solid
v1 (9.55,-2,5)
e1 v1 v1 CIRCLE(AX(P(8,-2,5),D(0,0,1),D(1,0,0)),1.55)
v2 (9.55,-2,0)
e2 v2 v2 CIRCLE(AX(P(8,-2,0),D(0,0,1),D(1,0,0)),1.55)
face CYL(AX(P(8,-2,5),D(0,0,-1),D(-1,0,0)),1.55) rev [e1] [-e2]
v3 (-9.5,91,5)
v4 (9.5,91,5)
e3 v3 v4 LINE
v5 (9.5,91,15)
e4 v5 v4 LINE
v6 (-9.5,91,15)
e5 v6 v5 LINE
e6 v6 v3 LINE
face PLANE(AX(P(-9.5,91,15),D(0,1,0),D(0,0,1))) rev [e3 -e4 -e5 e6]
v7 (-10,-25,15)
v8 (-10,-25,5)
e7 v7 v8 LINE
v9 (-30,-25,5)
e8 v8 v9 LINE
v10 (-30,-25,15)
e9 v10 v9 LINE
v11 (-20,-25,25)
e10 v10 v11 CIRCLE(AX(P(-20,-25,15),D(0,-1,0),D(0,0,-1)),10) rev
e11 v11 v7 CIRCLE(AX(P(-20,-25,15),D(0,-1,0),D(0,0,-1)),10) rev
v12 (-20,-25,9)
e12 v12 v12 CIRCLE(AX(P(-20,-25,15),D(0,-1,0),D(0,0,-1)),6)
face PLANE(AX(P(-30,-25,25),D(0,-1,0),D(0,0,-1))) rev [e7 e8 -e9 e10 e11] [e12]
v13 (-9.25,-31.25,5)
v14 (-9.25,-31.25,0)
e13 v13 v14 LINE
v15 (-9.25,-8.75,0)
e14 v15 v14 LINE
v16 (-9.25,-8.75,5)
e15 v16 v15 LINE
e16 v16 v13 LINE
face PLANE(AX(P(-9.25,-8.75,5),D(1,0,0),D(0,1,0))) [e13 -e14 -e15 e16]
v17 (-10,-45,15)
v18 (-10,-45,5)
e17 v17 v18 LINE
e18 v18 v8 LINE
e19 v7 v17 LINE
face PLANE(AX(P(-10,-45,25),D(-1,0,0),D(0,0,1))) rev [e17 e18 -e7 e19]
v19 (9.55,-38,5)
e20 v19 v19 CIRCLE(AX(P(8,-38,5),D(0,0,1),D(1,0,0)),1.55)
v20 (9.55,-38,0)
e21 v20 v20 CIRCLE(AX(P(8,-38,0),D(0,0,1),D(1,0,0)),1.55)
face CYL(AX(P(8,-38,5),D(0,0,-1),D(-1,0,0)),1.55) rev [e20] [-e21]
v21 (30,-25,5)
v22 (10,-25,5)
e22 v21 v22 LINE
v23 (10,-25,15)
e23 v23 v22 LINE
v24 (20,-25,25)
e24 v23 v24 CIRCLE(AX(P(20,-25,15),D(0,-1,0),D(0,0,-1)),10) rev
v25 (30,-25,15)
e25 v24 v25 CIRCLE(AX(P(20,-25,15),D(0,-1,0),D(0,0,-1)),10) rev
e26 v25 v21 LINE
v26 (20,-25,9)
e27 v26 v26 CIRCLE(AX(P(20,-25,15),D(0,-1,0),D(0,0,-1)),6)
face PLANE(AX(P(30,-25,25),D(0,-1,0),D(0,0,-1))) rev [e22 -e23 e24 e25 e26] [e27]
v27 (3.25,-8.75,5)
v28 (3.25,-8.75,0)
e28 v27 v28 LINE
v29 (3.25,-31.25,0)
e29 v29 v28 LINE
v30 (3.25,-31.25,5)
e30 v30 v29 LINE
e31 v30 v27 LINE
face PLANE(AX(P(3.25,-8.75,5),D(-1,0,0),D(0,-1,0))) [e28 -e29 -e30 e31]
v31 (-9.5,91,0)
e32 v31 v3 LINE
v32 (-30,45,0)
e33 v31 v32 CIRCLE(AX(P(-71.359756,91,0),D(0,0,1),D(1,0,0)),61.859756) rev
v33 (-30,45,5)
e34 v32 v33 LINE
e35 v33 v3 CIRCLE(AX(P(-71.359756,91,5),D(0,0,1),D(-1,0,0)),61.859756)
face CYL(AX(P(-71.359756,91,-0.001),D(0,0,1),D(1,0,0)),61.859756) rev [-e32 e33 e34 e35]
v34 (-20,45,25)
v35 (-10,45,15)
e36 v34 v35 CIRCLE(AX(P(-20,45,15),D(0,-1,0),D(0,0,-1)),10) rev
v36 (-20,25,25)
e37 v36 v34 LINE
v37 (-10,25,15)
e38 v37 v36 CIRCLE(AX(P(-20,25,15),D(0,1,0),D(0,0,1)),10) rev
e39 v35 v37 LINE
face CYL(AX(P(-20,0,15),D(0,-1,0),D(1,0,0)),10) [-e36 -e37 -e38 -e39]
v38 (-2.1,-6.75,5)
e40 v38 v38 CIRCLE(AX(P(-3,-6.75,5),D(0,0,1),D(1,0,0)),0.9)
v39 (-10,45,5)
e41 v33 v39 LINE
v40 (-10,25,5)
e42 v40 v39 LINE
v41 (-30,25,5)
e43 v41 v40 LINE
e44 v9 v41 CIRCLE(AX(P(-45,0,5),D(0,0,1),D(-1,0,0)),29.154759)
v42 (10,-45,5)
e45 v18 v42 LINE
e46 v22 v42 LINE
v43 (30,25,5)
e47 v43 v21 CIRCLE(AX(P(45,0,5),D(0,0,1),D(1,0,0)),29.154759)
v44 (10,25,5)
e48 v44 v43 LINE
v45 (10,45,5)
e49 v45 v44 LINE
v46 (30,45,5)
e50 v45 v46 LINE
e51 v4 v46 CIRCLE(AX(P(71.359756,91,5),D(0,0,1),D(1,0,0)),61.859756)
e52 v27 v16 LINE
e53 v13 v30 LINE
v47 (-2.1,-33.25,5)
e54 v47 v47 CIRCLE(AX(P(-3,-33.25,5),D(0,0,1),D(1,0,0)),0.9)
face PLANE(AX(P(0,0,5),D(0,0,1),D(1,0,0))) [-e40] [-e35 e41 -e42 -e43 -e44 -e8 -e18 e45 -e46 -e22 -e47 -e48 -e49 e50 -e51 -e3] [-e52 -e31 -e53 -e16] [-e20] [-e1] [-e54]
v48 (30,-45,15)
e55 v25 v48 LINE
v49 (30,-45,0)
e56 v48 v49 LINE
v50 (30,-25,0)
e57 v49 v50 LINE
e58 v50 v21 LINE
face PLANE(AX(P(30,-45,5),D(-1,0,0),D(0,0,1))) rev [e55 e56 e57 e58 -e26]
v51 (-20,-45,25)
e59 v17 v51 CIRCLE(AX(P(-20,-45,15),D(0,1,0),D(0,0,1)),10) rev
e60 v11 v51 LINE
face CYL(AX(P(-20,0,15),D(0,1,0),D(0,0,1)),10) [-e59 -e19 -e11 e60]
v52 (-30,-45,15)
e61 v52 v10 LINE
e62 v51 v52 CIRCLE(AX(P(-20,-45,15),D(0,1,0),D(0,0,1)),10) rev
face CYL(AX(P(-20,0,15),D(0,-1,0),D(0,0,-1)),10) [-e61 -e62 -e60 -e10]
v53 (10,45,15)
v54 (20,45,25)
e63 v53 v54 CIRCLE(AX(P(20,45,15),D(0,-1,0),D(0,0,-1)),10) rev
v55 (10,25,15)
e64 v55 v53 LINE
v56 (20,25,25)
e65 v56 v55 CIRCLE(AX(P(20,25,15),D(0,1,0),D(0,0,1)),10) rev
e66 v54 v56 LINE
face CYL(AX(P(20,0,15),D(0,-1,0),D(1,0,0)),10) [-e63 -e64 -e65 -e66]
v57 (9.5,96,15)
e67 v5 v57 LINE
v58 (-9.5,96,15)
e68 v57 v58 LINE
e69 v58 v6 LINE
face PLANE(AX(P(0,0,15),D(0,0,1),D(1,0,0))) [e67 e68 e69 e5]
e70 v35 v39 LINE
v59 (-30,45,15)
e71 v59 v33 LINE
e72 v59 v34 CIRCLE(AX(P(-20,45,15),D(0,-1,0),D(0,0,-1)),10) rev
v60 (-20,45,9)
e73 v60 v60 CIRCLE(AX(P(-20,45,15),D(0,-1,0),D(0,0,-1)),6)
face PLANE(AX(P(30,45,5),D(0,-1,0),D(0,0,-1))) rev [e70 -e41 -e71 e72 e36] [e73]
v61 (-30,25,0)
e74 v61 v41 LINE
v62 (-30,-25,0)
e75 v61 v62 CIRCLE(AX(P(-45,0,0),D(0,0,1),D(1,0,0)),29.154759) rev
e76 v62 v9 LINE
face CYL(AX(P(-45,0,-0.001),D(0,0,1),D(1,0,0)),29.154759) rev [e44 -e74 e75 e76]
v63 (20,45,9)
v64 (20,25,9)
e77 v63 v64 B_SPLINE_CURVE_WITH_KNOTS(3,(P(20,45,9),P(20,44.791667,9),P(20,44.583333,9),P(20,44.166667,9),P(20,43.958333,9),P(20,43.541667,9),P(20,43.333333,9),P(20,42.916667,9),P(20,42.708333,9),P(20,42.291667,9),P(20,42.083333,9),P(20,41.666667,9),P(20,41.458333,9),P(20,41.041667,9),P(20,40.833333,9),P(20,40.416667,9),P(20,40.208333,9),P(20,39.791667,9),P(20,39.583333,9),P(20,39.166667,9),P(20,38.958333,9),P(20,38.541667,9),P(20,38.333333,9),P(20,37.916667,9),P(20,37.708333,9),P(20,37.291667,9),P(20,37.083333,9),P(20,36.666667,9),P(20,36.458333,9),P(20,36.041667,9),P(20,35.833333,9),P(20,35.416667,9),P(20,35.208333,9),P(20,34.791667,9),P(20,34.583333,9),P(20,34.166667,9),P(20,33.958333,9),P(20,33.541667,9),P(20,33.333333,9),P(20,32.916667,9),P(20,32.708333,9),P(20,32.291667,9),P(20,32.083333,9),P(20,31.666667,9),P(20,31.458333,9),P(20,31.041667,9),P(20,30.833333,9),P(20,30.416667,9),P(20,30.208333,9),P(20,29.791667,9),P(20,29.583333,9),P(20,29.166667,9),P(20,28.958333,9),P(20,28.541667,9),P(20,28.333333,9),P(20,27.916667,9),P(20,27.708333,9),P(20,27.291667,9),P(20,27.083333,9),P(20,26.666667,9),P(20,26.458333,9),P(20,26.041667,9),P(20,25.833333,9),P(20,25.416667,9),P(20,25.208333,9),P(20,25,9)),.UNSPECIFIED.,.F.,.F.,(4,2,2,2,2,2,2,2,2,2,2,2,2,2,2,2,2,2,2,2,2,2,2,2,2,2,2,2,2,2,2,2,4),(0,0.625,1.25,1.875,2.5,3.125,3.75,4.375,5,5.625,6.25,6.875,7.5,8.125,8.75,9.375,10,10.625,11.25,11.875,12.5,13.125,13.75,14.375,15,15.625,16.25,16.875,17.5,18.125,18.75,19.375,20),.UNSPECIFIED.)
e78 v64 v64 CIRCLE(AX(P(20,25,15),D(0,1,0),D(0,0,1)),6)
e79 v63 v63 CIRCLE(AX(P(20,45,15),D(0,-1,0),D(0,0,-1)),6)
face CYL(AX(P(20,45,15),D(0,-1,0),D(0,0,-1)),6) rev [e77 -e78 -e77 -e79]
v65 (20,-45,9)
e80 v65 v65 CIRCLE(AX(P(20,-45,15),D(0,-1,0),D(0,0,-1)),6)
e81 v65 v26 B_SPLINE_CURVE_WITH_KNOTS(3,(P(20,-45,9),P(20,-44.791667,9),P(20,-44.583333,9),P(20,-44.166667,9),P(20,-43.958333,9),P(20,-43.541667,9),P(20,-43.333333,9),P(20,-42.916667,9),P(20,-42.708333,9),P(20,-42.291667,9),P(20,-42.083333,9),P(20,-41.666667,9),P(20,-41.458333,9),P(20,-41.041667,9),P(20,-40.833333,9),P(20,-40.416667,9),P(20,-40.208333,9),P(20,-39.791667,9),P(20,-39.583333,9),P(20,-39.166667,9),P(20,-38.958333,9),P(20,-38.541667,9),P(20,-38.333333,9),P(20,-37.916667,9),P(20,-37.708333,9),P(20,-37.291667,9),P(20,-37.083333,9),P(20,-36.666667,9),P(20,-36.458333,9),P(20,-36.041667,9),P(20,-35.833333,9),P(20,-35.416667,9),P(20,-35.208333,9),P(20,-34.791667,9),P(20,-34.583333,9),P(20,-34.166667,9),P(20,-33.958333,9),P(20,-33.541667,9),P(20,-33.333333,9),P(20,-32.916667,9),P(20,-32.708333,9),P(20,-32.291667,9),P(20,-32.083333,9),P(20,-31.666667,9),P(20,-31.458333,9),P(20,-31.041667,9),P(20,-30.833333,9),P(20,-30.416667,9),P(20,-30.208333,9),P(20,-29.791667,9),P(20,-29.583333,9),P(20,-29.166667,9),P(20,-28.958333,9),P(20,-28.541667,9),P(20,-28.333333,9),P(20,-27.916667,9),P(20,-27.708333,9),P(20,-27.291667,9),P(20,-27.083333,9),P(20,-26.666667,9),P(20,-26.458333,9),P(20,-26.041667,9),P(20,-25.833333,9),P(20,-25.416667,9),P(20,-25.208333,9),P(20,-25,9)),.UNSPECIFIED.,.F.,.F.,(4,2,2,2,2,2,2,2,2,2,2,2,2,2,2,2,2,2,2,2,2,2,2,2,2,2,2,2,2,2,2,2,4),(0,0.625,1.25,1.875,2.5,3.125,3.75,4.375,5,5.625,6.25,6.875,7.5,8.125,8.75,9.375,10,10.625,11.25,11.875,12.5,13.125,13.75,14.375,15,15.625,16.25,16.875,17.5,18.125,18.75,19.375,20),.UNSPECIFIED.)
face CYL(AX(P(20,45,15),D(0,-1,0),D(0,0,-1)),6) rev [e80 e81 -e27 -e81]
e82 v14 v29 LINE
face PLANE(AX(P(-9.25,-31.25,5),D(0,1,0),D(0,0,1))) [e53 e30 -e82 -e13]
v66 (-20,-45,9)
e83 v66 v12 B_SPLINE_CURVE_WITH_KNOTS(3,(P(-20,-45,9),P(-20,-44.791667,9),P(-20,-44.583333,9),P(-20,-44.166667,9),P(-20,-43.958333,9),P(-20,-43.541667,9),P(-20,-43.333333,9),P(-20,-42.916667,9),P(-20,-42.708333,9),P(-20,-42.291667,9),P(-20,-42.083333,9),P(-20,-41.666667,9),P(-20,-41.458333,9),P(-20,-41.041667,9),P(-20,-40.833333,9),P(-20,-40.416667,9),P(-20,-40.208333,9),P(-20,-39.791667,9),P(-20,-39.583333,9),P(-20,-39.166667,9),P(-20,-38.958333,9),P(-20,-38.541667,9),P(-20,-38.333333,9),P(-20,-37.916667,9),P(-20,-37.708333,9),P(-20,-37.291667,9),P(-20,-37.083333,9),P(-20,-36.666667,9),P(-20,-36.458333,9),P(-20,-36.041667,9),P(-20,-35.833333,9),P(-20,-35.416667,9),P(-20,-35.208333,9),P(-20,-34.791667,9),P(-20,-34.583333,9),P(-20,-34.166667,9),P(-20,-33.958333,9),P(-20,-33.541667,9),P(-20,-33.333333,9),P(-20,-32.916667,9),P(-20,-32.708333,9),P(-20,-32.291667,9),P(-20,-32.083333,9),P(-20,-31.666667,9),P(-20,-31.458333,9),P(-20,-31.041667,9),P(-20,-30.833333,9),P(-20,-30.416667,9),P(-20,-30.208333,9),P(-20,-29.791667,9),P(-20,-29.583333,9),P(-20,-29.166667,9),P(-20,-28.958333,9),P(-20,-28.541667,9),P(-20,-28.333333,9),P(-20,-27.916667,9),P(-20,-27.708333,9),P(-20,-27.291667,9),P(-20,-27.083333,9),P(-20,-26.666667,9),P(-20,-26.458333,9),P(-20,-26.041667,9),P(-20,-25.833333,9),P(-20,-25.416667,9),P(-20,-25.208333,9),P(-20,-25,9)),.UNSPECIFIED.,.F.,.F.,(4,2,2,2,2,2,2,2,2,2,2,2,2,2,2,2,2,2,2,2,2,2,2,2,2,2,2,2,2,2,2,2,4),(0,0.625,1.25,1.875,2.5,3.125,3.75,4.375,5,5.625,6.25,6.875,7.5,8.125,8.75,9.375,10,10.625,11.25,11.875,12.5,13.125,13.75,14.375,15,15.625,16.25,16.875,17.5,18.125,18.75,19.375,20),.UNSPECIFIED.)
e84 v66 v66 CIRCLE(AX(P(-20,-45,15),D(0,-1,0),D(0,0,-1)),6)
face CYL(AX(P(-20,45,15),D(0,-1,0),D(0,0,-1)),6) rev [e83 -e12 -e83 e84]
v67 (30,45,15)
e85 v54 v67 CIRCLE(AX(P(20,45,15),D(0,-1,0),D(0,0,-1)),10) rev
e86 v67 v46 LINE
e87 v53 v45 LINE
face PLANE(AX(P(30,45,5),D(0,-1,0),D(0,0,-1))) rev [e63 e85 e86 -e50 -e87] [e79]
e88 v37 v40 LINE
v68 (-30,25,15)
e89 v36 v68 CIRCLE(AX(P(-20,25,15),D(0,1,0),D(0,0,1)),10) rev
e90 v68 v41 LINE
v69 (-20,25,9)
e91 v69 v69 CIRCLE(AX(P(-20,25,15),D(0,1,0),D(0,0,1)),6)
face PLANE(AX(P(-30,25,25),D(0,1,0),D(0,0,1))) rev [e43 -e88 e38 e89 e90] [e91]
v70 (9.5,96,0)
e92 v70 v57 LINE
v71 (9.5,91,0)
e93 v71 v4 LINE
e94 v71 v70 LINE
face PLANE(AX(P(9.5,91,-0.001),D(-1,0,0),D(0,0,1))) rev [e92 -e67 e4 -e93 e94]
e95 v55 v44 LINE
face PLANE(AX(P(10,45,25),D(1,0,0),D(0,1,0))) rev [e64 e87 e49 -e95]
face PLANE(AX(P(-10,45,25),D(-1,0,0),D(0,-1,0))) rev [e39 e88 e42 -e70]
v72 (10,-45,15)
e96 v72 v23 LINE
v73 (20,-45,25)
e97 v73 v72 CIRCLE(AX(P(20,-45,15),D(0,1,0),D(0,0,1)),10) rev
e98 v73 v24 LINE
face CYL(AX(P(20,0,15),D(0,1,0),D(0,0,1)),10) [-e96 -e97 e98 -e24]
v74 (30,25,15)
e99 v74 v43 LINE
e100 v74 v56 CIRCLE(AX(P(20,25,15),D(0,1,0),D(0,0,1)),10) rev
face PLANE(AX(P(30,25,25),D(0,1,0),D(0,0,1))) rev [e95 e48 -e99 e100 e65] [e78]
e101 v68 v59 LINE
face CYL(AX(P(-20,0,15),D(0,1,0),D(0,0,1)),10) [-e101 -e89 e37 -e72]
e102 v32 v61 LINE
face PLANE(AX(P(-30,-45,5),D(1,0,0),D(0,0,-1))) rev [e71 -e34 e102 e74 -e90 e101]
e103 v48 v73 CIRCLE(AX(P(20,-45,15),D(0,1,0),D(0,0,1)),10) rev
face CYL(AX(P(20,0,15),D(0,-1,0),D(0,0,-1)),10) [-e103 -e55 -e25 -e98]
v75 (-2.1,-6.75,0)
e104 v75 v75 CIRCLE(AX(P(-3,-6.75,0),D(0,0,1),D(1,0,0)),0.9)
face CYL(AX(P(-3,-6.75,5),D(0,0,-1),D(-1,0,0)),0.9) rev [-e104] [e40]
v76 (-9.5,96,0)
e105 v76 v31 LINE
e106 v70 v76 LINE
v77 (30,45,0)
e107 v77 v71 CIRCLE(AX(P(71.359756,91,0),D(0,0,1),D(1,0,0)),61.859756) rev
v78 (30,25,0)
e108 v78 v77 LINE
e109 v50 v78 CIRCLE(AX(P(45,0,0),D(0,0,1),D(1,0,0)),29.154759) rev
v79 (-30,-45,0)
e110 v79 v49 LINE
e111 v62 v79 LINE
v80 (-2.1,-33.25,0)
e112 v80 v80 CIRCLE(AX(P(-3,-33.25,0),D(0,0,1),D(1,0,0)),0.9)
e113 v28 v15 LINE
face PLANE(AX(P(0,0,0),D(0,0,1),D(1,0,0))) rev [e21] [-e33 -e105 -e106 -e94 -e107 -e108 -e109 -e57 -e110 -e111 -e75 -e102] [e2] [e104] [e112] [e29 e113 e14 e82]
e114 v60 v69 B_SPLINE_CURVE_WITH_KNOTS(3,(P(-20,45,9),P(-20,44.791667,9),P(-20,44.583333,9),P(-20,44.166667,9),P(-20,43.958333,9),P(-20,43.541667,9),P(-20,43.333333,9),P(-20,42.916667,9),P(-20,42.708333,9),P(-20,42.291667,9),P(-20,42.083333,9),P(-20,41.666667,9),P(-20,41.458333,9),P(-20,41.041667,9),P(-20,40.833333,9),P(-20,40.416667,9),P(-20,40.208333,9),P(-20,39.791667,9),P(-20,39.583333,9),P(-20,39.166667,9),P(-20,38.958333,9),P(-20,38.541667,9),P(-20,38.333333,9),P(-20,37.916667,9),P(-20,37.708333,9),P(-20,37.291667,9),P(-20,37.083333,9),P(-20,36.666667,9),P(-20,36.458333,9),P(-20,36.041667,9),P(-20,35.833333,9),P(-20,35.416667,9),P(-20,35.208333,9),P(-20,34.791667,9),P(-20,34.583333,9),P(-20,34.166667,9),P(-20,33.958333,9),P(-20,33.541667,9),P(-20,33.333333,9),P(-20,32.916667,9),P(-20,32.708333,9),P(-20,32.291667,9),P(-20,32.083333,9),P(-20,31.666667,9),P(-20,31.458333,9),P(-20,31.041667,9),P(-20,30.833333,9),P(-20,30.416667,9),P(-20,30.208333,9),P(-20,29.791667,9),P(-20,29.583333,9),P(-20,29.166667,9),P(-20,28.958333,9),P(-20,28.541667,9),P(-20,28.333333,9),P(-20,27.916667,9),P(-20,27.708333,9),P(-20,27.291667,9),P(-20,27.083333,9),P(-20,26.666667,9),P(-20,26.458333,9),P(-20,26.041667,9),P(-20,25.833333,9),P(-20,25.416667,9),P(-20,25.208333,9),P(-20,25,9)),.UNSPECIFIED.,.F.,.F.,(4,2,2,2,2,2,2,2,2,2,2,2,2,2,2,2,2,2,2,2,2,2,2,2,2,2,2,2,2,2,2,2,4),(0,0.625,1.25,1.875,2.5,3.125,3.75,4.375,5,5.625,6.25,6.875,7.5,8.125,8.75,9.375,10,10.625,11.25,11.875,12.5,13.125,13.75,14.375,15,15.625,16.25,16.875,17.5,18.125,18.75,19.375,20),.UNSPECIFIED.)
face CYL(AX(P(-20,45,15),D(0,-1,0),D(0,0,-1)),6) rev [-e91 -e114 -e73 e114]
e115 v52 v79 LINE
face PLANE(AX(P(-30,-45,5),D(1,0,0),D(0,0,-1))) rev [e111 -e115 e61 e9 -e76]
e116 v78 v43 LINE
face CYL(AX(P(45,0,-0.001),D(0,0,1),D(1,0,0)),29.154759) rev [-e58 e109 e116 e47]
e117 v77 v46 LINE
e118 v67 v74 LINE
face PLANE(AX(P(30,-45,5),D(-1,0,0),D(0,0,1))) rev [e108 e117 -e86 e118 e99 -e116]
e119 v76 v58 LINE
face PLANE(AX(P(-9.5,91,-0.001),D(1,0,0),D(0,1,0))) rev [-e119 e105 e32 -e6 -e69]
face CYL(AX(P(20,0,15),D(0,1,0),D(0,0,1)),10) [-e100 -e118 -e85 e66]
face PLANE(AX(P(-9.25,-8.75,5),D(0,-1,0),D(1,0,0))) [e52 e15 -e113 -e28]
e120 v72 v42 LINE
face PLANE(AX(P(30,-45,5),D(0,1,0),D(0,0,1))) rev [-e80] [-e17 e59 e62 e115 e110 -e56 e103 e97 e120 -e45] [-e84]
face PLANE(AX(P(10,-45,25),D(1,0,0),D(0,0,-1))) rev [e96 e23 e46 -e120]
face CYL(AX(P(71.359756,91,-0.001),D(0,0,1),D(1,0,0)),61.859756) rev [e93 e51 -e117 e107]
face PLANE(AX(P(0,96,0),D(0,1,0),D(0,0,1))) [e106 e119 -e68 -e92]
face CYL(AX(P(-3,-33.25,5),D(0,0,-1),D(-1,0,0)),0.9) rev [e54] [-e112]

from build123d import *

# Parameters (mm, degrees)
SKETCH1_W           = 60
SKETCH1_H           = 90
SKETCH1_R           = 0.9
SKETCH1_R_2         = 1.55
SKETCH1_W_2         = 12.5
SKETCH1_H_2         = 22.5
BOSS_EXTRUDE1_DEPTH = 5
SKETCH2_W           = 20
SKETCH2_H           = 20
BOSS_EXTRUDE2_DEPTH = 20
FILLET1_R           = 10
SKETCH3_R           = 6
CUT_EXTRUDE1_DEPTH  = 99.107084352
CUT_EXTRUDE2_REACH  = 59.663
SKETCH5_W           = 60
SKETCH5_H           = 5
BOSS_EXTRUDE3_DEPTH = 51
CUT_EXTRUDE3_REACH  = 104.548
SKETCH7_W           = 19
SKETCH7_H           = 5
BOSS_EXTRUDE4_DEPTH = 10


with BuildPart() as part:
    # Sketch1 → Boss-Extrude1 (new body)
    with BuildSketch(Plane.XY):
        Rectangle(SKETCH1_W, SKETCH1_H)
        with Locations((-3, -33.25)):
            Circle(SKETCH1_R, mode=Mode.SUBTRACT)
        with Locations((-3, -6.75)):
            Circle(SKETCH1_R, mode=Mode.SUBTRACT)
        with Locations((8, -38)):
            Circle(SKETCH1_R_2, mode=Mode.SUBTRACT)
        with Locations((8, -2)):
            Circle(SKETCH1_R_2, mode=Mode.SUBTRACT)
        with Locations((-3, -20)):
            Rectangle(SKETCH1_W_2, SKETCH1_H_2, mode=Mode.SUBTRACT)
    extrude(amount=BOSS_EXTRUDE1_DEPTH)

    # Sketch2 → Boss-Extrude2 (add)
    with BuildSketch(Plane.XY.offset(5)):
        with Locations((-20, -35)):
            Rectangle(SKETCH2_W, SKETCH2_H)
        with Locations((-20, 35)):
            Rectangle(SKETCH2_W, SKETCH2_H)
        with Locations((20, 35)):
            Rectangle(SKETCH2_W, SKETCH2_H)
        with Locations((20, -35)):
            Rectangle(SKETCH2_W, SKETCH2_H)
    extrude(amount=BOSS_EXTRUDE2_DEPTH)

    # Fillet1
    fillet1_edges = [part.edges().sort_by_distance(p)[0] for p in [
        (10, -35, 25),
        (30, -35, 25),
        (30, 35, 25),
        (10, 35, 25),
        (-30, 35, 25),
        (-10, 35, 25),
        (-10, -35, 25),
        (-30, -35, 25),
    ]]
    fillet(fillet1_edges, radius=FILLET1_R - 0.0001)  # a hair under: the kernel refuses the full size

    # Sketch3 → Cut-Extrude1 (cut, through all)
    with BuildSketch(Plane.XZ.offset(45)):
        with Locations(Location((-20, 15, 0), (0, 0, 270))):
            Circle(SKETCH3_R)
        with Locations(Location((20, 15, 0), (0, 0, 270))):
            Circle(SKETCH3_R)
    extrude(amount=-CUT_EXTRUDE1_DEPTH, mode=Mode.SUBTRACT)

    # Sketch4 → Cut-Extrude2 (cut, up to next)
    with BuildSketch(Plane.XY.offset(5), mode=Mode.PRIVATE) as cut_extrude2_sk1:
        with BuildLine():
            Line((-30, 25), (-30, -25))
            ThreePointArc((-30, -25), (-15.845240526, 0), (-30, 25))
        make_face()
    cut_extrude2_tool1 = extrude(cut_extrude2_sk1.sketch, amount=-CUT_EXTRUDE2_REACH, mode=Mode.PRIVATE) & part.part
    # Sketch4 → Cut-Extrude2 (cut, up to next)
    with BuildSketch(Plane.XY.offset(5), mode=Mode.PRIVATE) as cut_extrude2_sk2:
        with BuildLine():
            Line((30, 25), (30, -25))
            ThreePointArc((30, -25), (15.845240526, 0), (30, 25))
        make_face()
    cut_extrude2_tool2 = extrude(cut_extrude2_sk2.sketch, amount=-CUT_EXTRUDE2_REACH, mode=Mode.PRIVATE) & part.part
    add(cut_extrude2_tool1.solids().sort_by_distance((-24.20079, 0, 5))[0], mode=Mode.SUBTRACT)
    add(cut_extrude2_tool2.solids().sort_by_distance((24.20079, 0, 5))[0], mode=Mode.SUBTRACT)

    # Sketch5 → Boss-Extrude3 (add)
    with BuildSketch(Plane(origin=(0, 45, 0), x_dir=(1, 0, 0), z_dir=(0, 1, 0))):
        with Locations((0, -2.5)):
            Rectangle(SKETCH5_W, SKETCH5_H)
    extrude(amount=BOSS_EXTRUDE3_DEPTH)

    # Sketch6 → Cut-Extrude3 (cut, up to next)
    with BuildSketch(Plane.XY.offset(5), mode=Mode.PRIVATE) as cut_extrude3_sk1:
        with BuildLine():
            Line((-9.5, 91), (-9.5, 96))
            Line((-9.5, 96), (-30, 96))
            Line((-30, 96), (-30, 45))
            ThreePointArc((-30, 45), (-14.856951526, 65.819402311), (-9.5, 91))
        make_face()
    cut_extrude3_tool1 = extrude(cut_extrude3_sk1.sketch, amount=-CUT_EXTRUDE3_REACH, mode=Mode.PRIVATE) & part.part
    # Sketch6 → Cut-Extrude3 (cut, up to next)
    with BuildSketch(Plane.XY.offset(5), mode=Mode.PRIVATE) as cut_extrude3_sk2:
        with BuildLine():
            Line((9.5, 91), (9.5, 96))
            Line((9.5, 96), (30, 96))
            Line((30, 96), (30, 45))
            ThreePointArc((30, 45), (14.856951526, 65.819402311), (9.5, 91))
        make_face()
    cut_extrude3_tool2 = extrude(cut_extrude3_sk2.sketch, amount=-CUT_EXTRUDE3_REACH, mode=Mode.PRIVATE) & part.part
    add(cut_extrude3_tool1.solids().sort_by_distance((-21.41045, 76.034299, 5))[0], mode=Mode.SUBTRACT)
    add(cut_extrude3_tool2.solids().sort_by_distance((21.41045, 76.034299, 5))[0], mode=Mode.SUBTRACT)

    # Sketch7 → Boss-Extrude4 (add)
    with BuildSketch(Plane.XY.offset(5)):
        with Locations((0, 93.5)):
            Rectangle(SKETCH7_W, SKETCH7_H)
    extrude(amount=BOSS_EXTRUDE4_DEPTH)


solid = part.part
